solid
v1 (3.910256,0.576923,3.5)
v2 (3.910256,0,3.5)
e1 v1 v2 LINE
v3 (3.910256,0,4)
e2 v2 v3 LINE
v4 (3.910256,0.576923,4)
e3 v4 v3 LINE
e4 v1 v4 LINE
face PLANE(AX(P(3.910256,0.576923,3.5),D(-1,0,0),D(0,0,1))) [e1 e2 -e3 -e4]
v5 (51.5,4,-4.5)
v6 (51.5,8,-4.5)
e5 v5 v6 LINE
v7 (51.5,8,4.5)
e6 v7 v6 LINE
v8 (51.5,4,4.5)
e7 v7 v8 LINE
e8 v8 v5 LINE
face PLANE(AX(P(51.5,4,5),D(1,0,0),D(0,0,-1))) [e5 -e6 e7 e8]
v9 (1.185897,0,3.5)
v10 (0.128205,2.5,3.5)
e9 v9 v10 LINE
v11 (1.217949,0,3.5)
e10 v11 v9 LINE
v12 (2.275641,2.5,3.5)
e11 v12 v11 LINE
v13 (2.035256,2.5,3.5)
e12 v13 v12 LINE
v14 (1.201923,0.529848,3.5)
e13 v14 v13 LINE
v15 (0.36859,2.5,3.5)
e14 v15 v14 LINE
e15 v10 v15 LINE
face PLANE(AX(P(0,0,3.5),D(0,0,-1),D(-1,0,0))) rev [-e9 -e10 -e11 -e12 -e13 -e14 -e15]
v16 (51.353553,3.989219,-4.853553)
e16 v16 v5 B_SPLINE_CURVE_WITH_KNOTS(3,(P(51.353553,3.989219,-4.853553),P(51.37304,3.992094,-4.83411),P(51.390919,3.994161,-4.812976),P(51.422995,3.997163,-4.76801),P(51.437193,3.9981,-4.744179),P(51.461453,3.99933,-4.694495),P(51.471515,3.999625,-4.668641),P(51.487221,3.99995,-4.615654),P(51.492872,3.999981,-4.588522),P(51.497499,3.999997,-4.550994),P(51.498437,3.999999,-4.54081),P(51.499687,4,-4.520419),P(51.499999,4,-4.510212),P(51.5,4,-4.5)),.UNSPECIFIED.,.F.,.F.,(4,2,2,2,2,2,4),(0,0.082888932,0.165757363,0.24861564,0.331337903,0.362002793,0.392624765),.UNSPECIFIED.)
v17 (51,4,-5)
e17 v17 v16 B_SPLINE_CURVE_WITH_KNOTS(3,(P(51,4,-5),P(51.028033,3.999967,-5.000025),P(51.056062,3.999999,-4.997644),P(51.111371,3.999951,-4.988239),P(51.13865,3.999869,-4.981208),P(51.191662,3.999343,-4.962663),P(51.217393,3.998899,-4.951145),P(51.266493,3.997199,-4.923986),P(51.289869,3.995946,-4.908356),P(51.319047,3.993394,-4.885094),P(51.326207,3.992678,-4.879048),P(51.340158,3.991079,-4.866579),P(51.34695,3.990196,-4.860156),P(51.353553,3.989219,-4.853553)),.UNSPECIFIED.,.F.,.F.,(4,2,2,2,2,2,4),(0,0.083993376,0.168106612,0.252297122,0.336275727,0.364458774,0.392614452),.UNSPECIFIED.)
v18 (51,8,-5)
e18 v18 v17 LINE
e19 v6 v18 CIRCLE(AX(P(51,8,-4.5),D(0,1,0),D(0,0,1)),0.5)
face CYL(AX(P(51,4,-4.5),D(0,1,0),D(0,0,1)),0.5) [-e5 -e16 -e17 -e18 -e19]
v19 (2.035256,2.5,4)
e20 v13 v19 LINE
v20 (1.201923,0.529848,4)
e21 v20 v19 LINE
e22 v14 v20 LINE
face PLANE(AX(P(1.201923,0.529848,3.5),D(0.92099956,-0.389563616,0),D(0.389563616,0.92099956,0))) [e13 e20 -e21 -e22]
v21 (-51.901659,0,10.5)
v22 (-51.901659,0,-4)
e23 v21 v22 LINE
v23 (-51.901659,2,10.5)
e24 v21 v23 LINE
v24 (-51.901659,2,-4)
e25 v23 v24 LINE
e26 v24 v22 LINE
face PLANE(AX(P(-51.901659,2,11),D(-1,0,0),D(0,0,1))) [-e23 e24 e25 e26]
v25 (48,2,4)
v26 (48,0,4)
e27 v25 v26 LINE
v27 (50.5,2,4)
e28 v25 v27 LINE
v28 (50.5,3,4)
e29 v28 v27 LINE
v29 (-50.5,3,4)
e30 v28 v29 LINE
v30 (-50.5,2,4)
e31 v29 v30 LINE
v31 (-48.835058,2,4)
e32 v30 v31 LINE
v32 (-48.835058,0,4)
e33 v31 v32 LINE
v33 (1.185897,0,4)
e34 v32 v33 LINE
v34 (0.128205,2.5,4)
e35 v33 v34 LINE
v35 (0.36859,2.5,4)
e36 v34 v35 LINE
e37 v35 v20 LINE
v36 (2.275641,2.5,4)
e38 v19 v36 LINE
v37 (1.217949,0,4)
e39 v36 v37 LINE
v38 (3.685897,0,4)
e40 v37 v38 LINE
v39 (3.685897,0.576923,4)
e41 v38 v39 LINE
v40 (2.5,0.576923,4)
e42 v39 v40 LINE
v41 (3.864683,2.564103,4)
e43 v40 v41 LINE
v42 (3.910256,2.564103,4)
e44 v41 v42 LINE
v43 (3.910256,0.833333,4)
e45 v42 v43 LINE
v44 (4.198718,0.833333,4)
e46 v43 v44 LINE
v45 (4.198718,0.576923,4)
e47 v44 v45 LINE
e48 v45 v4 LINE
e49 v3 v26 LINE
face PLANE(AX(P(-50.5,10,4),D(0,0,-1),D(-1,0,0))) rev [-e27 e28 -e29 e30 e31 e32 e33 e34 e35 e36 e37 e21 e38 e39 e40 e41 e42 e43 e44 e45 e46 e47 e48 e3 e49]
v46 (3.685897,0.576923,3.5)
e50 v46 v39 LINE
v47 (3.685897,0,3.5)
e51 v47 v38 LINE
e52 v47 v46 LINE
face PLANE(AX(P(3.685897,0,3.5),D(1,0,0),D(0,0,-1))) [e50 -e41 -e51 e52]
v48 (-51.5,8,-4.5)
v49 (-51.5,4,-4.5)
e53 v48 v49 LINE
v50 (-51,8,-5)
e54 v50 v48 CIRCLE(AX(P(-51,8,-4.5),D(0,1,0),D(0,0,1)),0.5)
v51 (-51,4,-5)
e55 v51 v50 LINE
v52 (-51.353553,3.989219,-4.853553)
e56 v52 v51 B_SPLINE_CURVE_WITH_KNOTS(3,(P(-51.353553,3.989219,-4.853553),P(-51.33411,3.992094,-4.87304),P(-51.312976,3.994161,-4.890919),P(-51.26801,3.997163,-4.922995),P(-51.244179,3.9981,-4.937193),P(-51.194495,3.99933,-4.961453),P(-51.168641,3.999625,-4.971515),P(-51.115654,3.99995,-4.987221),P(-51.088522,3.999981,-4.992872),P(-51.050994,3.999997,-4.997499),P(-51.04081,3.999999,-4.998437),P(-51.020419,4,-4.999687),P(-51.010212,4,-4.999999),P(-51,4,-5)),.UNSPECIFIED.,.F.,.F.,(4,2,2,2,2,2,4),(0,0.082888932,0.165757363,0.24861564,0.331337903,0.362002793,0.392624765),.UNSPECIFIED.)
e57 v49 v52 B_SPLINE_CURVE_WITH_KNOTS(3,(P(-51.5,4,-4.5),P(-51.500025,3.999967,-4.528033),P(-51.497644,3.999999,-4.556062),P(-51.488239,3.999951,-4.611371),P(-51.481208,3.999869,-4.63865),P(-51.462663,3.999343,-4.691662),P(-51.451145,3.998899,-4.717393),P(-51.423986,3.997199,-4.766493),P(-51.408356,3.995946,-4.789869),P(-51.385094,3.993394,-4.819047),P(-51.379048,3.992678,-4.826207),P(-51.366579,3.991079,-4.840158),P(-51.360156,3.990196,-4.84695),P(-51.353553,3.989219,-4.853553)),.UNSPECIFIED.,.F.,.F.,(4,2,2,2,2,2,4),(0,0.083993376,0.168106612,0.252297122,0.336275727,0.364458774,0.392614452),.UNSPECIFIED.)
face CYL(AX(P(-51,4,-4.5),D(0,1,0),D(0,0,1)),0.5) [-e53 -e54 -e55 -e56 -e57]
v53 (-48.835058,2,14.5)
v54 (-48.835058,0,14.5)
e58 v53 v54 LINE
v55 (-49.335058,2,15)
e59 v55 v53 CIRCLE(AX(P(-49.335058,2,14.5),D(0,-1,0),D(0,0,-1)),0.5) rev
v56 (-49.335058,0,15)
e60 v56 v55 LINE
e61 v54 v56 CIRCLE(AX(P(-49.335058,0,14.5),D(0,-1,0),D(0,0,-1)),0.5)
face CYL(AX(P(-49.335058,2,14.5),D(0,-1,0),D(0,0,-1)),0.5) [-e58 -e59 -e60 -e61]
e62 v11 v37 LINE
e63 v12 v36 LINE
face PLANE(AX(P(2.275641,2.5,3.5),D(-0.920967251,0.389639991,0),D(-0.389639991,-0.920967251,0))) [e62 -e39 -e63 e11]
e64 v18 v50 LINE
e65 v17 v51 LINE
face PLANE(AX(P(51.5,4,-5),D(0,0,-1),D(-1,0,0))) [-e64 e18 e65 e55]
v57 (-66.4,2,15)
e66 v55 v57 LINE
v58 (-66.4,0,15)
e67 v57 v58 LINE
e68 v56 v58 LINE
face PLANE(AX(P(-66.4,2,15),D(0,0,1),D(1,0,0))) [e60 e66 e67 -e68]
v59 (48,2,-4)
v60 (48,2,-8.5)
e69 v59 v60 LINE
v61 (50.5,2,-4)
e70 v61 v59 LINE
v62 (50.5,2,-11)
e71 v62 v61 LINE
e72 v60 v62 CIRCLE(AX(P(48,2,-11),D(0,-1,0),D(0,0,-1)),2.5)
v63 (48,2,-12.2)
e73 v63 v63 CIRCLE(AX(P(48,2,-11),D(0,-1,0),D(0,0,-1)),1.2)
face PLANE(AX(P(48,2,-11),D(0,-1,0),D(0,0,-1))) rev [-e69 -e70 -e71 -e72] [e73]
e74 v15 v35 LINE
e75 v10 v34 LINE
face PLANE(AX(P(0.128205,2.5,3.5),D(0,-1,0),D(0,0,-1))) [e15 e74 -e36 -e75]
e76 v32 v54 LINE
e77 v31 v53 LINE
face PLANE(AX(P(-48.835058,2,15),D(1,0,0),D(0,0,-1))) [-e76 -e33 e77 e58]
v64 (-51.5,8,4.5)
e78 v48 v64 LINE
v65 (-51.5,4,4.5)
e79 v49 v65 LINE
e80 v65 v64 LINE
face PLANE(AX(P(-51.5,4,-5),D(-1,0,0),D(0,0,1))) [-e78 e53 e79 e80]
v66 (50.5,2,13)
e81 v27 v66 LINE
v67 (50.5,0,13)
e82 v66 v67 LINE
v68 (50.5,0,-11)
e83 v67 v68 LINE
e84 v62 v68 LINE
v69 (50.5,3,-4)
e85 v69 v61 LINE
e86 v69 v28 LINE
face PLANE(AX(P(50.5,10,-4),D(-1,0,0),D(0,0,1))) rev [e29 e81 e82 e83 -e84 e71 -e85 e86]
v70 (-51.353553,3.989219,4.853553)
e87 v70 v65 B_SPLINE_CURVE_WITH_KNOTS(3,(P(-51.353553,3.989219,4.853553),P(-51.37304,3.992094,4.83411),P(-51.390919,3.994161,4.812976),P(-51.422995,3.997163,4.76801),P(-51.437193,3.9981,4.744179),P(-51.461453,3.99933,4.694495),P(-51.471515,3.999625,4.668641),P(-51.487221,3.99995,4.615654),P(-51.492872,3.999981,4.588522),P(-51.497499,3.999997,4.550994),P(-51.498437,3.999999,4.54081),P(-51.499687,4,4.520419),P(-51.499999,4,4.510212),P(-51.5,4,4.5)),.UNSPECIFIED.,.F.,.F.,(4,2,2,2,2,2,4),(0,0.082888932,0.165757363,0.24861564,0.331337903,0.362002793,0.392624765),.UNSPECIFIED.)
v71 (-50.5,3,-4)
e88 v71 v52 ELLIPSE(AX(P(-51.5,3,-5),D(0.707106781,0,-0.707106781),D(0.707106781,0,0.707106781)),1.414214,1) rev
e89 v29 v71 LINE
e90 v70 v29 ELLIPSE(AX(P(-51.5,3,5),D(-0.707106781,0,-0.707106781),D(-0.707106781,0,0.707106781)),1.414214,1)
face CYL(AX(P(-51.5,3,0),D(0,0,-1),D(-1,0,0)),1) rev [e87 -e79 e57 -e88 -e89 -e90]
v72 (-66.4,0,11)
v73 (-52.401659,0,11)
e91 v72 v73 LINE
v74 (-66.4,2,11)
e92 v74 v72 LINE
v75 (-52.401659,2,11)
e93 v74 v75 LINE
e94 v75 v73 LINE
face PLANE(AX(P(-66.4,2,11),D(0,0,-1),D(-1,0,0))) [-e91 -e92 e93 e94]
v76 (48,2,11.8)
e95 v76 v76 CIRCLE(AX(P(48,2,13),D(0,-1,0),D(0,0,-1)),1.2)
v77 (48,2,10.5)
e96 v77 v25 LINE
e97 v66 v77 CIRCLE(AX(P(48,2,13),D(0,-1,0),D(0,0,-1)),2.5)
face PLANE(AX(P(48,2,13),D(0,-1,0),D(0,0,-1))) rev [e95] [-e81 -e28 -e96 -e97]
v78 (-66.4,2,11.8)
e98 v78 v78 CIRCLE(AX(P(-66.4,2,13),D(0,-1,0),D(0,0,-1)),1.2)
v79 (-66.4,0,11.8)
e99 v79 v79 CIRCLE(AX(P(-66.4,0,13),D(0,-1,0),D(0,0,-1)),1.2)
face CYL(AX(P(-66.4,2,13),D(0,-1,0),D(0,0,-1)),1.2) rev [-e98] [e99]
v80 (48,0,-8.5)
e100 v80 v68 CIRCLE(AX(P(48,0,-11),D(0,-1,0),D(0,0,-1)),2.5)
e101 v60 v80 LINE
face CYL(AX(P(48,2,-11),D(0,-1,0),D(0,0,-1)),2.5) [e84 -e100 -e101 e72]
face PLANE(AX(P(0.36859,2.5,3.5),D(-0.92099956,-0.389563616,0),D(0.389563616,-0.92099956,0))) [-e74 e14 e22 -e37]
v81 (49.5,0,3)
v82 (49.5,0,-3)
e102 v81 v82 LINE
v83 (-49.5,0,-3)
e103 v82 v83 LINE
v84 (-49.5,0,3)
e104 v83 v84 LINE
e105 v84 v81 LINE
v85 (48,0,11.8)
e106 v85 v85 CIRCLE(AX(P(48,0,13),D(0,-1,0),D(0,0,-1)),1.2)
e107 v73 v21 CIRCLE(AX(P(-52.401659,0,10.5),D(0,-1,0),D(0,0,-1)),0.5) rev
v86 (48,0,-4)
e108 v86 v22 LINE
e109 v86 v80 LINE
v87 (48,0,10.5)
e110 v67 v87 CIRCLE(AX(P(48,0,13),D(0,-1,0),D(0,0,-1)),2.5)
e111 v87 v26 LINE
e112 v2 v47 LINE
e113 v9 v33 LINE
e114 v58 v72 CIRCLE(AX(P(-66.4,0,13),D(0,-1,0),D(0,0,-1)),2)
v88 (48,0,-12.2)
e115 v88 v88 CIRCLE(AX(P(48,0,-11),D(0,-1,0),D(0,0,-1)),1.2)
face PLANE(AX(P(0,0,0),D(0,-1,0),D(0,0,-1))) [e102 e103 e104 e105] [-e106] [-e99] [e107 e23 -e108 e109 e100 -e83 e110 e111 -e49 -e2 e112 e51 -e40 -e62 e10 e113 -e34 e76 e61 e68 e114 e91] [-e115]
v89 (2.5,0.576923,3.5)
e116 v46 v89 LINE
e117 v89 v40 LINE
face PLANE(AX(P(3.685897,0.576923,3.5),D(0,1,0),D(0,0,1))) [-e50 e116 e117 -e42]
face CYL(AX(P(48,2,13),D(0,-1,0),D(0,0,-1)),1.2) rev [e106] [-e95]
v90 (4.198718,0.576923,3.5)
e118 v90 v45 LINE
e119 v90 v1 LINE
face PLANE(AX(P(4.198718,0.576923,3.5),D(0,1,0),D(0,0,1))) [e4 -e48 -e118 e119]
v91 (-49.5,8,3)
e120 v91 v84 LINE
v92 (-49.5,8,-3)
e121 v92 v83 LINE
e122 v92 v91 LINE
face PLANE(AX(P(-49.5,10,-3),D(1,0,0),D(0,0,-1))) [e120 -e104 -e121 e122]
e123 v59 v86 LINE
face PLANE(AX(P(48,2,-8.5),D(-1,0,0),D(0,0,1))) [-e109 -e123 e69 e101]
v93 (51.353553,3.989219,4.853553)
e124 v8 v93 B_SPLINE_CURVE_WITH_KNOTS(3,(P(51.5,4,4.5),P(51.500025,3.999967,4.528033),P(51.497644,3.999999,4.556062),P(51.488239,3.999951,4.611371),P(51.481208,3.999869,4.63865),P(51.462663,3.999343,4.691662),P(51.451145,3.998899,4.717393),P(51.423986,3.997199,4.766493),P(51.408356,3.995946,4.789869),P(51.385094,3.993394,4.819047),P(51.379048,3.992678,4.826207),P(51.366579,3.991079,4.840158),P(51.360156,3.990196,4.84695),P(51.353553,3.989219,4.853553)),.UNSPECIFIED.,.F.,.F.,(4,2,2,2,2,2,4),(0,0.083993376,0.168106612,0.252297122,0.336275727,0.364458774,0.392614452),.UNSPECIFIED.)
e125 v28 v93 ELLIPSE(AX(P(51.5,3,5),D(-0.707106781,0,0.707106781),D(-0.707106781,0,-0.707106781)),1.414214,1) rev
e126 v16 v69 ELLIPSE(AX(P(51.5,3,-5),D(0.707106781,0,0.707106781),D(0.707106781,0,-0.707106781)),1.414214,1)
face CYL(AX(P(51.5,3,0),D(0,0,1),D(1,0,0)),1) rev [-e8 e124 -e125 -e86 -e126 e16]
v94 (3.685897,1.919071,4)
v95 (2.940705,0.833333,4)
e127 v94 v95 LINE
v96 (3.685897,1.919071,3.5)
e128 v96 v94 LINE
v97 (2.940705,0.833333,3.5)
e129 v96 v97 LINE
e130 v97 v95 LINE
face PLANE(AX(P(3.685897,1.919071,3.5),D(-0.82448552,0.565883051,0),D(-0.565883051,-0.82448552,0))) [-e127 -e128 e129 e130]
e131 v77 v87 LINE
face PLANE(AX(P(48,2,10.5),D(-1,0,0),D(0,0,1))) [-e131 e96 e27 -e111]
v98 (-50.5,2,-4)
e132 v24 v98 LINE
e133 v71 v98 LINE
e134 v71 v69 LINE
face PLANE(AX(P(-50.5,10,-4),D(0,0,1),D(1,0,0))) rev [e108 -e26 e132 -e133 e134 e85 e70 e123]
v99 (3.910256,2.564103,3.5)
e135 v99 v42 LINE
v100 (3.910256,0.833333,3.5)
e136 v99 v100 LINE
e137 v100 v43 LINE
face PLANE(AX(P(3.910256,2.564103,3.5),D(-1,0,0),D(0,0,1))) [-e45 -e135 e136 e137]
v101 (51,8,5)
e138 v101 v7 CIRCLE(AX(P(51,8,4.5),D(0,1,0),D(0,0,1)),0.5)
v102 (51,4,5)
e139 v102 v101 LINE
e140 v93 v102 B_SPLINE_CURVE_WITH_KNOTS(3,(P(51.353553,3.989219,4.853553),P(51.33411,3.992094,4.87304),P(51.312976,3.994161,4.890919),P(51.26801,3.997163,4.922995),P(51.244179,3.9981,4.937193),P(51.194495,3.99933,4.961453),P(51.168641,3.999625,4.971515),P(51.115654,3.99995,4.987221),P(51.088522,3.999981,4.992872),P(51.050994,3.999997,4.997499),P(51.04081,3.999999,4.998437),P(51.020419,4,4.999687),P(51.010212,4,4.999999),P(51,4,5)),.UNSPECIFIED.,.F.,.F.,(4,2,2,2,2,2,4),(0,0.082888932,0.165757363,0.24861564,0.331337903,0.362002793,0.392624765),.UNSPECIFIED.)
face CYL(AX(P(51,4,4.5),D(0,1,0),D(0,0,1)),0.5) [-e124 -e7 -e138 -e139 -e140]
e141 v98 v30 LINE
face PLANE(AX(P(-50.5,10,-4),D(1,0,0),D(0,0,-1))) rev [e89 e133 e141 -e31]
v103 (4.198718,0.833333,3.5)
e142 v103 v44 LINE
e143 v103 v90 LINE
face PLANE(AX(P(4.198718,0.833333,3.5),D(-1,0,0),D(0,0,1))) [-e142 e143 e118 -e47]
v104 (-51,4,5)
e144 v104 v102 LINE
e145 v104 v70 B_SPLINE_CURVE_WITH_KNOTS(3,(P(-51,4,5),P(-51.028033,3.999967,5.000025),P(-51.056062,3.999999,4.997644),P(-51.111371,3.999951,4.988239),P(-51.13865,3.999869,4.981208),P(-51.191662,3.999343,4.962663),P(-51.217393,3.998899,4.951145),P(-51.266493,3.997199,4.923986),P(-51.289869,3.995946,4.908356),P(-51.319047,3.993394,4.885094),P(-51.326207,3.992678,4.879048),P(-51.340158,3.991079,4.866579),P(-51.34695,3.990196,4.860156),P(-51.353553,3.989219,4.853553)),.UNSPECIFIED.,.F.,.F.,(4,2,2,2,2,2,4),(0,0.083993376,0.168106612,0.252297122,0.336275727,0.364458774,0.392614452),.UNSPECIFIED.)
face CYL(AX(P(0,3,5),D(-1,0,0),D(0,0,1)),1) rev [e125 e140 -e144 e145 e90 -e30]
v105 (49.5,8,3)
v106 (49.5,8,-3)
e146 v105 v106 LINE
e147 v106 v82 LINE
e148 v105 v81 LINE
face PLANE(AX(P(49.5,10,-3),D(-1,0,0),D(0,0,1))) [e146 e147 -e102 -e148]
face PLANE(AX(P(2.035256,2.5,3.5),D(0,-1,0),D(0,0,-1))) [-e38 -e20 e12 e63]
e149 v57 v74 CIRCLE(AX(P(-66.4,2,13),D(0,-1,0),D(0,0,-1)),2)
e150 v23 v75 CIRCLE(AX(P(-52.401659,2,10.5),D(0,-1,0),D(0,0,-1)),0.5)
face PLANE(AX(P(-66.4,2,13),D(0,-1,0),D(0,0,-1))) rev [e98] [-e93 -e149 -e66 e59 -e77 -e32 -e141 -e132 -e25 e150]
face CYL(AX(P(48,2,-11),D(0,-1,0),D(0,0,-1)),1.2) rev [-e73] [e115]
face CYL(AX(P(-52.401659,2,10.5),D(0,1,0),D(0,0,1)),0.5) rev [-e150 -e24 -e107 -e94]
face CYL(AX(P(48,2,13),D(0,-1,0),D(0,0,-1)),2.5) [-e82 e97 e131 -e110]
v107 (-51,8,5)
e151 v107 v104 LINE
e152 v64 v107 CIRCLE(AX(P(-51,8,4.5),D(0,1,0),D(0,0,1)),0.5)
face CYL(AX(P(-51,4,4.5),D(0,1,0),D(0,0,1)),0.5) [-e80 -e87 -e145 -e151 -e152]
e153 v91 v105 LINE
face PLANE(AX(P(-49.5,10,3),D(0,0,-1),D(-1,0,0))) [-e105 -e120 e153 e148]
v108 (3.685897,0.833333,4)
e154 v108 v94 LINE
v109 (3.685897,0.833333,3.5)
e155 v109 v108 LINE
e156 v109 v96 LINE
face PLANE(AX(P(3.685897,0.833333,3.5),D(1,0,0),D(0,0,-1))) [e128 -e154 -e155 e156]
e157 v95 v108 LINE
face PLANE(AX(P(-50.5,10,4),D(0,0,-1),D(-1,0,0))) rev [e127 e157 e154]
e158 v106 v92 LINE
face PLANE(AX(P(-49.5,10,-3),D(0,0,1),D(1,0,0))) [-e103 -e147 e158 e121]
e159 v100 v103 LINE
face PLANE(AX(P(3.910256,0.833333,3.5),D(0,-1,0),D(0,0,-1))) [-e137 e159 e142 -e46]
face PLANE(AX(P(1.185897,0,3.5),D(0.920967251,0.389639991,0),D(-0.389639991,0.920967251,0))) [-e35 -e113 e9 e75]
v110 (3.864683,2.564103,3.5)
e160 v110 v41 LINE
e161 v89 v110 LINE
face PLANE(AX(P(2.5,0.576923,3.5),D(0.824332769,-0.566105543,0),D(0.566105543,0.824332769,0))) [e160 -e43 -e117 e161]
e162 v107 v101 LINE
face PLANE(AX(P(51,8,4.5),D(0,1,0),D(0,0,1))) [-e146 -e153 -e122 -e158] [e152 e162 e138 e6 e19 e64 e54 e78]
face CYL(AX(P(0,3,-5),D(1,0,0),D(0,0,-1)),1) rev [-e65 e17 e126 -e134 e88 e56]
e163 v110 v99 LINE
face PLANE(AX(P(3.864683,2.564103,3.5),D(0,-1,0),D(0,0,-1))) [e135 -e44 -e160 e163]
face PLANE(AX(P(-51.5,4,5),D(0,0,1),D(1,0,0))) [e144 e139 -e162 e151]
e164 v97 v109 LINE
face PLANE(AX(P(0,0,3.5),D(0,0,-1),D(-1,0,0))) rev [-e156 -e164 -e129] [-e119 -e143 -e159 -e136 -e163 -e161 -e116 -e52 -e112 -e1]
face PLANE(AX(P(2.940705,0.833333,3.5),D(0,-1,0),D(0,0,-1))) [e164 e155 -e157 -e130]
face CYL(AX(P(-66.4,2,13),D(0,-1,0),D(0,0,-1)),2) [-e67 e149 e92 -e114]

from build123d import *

# Parameters (mm, degrees)
SKETCH1_W           = 101
SKETCH1_H           = 8
SKETCH1_W_2         = 99
SKETCH1_H_2         = 6
BOSS_EXTRUDE1_DEPTH = 10
SKETCH2_R           = 1.2
BOSS_EXTRUDE2_DEPTH = 2
SKETCH3_W           = 103
SKETCH3_H           = 10
SKETCH3_W_2         = 101
SKETCH3_H_2         = 8
BOSS_EXTRUDE3_DEPTH = 6
FILLET4_R           = 1
FILLET5_R           = 1
FILLET6_R           = 1
FILLET7_R           = 1
FILLET8_R           = 0.5
FILLET9_R           = 0.5
CUT_EXTRUDE1_DEPTH  = 2
CUT_EXTRUDE2_DEPTH  = 0.5


# Some blends are built 0.0001 mm under size
with BuildPart() as part:
    # Sketch1 → Boss-Extrude1 (new body)
    with BuildSketch(Plane(origin=(0, 0, 0), x_dir=(1, 0, 0), z_dir=(0, 1, 0))):
        Rectangle(SKETCH1_W, SKETCH1_H)
        Rectangle(SKETCH1_W_2, SKETCH1_H_2, mode=Mode.SUBTRACT)
    extrude(amount=BOSS_EXTRUDE1_DEPTH)

    # Sketch2 → Boss-Extrude2 (add)
    # profile 1 of 3: a face of its own
    with BuildSketch(Plane.XZ):
        with BuildLine():
            Line((48, 4), (50.5, 4))
            Line((50.5, 4), (50.5, 13))
            ThreePointArc((50.5, 13), (46.232233047, 14.767766953), (48, 10.5))
            Line((48, 10.5), (48, 4))
        make_face()
        with Locations(Location((48, 13, 0), (0, 0, 270))):
            Circle(SKETCH2_R, mode=Mode.SUBTRACT)
    # profile 2 of 3: a face of its own
    with BuildSketch(Plane.XZ):
        with BuildLine():
            Line((48, -4), (50.5, -4))
            Line((50.5, -4), (50.5, -11))
            ThreePointArc((50.5, -11), (46.232233047, -12.767766953), (48, -8.5))
            Line((48, -8.5), (48, -4))
        make_face()
        with Locations(Location((48, -11, 0), (0, 0, 270))):
            Circle(SKETCH2_R, mode=Mode.SUBTRACT)
    # profile 3 of 3: a face of its own
    with BuildSketch(Plane.XZ):
        with BuildLine():
            Line((-66.4, 15), (-48.835058433, 15))
            Line((-48.835058433, 15), (-48.835058433, 4))
            Line((-48.835058433, 4), (-50.5, 4))
            Line((-50.5, 4), (-50.5, -4))
            Line((-50.5, -4), (-51.901659191, -4))
            Line((-51.901659191, -4), (-51.901659191, 11))
            Line((-51.901659191, 11), (-66.4, 11))
            ThreePointArc((-66.4, 11), (-68.4, 13), (-66.4, 15))
        make_face()
        with Locations(Location((-66.4, 13, 0), (0, 0, 270))):
            Circle(SKETCH2_R, mode=Mode.SUBTRACT)
    extrude(amount=-BOSS_EXTRUDE2_DEPTH)

    # Sketch3 → Boss-Extrude3 (add)
    with BuildSketch(Plane(origin=(0, 10, 0), x_dir=(1, 0, 0), z_dir=(0, 1, 0))):
        Rectangle(SKETCH3_W, SKETCH3_H)
        Rectangle(SKETCH3_W_2, SKETCH3_H_2, mode=Mode.SUBTRACT)
    extrude(amount=-BOSS_EXTRUDE3_DEPTH)

    # Fillet4
    fillet4_edges = [part.edges().sort_by_distance(p)[0] for p in [
        (0, 4, -4),
    ]]
    fillet(fillet4_edges, radius=FILLET4_R - 0.0001)  # a hair under: the kernel refuses the full size

    # Fillet5
    fillet5_edges = [part.edges().sort_by_distance(p)[0] for p in [
        (0, 4, 4),
    ]]
    fillet(fillet5_edges, radius=FILLET5_R - 0.0001)  # a hair under: the kernel refuses the full size

    # Fillet6
    fillet6_edges = [part.edges().sort_by_distance(p)[0] for p in [
        (50.5, 4, 0),
    ]]
    fillet(fillet6_edges, radius=FILLET6_R - 0.0001)  # a hair under: the kernel refuses the full size

    # Fillet7
    fillet7_edges = [part.edges().sort_by_distance(p)[0] for p in [
        (-50.5, 4, 0),
    ]]
    fillet(fillet7_edges, radius=FILLET7_R - 0.0001)  # a hair under: the kernel refuses the full size

    # Fillet8
    fillet8_edges = [part.edges().sort_by_distance(p)[0] for p in [
        (-51.901659191, 1, 11),
        (-48.835058433, 1, 15),
    ]]
    fillet(fillet8_edges, radius=FILLET8_R)

    # Fillet9
    # the kernel refuses this fillet: 0.5 mm, written as the material it takes off along each edge
    with BuildSketch(Plane(origin=(51.5, 11.25, -5), x_dir=(-1, 0, 0), z_dir=(0, -1, 0))) as fillet9_piece_1:
        with BuildLine():
            CenterArc((FILLET9_R, -FILLET9_R), FILLET9_R, 90, 90)
            Line((0, -FILLET9_R), (0, 0))
            Line((0, 0), (FILLET9_R, 0))
        make_face()
    extrude(amount=8.5, mode=Mode.SUBTRACT)
    with BuildSketch(Plane(origin=(51.5, 11.25, 5), x_dir=(-1, 0, 0), z_dir=(0, -1, 0)), Plane(origin=(-51.5, 11.25, 5), x_dir=(0, 0, -1), z_dir=(0, -1, 0)), Plane(origin=(-51.5, 11.25, -5), x_dir=(1, 0, 0), z_dir=(0, -1, 0))) as fillet9_piece_2:
        with BuildLine():
            CenterArc((FILLET9_R, FILLET9_R), FILLET9_R, 180, 90)
            Line((0, FILLET9_R), (0, 0))
            Line((0, 0), (FILLET9_R, 0))
        make_face()
    extrude(amount=8.5, mode=Mode.SUBTRACT)

    # Sketch4 → Cut-Extrude1 (cut)
    with BuildSketch(Plane(origin=(0, 10, 0), x_dir=(1, 0, 0), z_dir=(0, 1, 0))):
        with BuildLine():
            Line((51.5, -4.5), (51.5, 4.5))
            ThreePointArc((51.5, 4.5), (51.353553391, 4.853553391), (51, 5))
            Line((51, 5), (-51, 5))
            ThreePointArc((-51, 5), (-51.353553391, 4.853553391), (-51.5, 4.5))
            Line((-51.5, 4.5), (-51.5, -4.5))
            ThreePointArc((-51.5, -4.5), (-51.353553391, -4.853553391), (-51, -5))
            Line((-51, -5), (51, -5))
            ThreePointArc((51, -5), (51.353553391, -4.853553391), (51.5, -4.5))
        make_face()
    extrude(amount=-CUT_EXTRUDE1_DEPTH, mode=Mode.SUBTRACT)

    # Sketch5 → Cut-Extrude2 (cut)
    # profile 1 of 2: a face of its own
    with BuildSketch(Plane.XY.offset(4)):
        Polygon((0.128205128, 2.5), (0.368589744, 2.5), (1.201923077, 0.529847756), (2.03525641, 2.5), (2.275641026, 2.5), (1.217948718, 0), (1.185897436, 0), align=None)
    # profile 2 of 2: a face of its own
    with BuildSketch(Plane.XY.offset(4)):
        Polygon((3.864683494, 2.564102564), (3.91025641, 2.564102564), (3.91025641, 0.833333333), (4.198717949, 0.833333333), (4.198717949, 0.576923077), (3.91025641, 0.576923077), (3.91025641, 0), (3.685897436, 0), (3.685897436, 0.576923077), (2.5, 0.576923077), align=None)
        Polygon((3.685897436, 0.833333333), (3.685897436, 1.919070513), (2.940705128, 0.833333333), align=None, mode=Mode.SUBTRACT)
    extrude(amount=-CUT_EXTRUDE2_DEPTH, mode=Mode.SUBTRACT)


solid = part.part
